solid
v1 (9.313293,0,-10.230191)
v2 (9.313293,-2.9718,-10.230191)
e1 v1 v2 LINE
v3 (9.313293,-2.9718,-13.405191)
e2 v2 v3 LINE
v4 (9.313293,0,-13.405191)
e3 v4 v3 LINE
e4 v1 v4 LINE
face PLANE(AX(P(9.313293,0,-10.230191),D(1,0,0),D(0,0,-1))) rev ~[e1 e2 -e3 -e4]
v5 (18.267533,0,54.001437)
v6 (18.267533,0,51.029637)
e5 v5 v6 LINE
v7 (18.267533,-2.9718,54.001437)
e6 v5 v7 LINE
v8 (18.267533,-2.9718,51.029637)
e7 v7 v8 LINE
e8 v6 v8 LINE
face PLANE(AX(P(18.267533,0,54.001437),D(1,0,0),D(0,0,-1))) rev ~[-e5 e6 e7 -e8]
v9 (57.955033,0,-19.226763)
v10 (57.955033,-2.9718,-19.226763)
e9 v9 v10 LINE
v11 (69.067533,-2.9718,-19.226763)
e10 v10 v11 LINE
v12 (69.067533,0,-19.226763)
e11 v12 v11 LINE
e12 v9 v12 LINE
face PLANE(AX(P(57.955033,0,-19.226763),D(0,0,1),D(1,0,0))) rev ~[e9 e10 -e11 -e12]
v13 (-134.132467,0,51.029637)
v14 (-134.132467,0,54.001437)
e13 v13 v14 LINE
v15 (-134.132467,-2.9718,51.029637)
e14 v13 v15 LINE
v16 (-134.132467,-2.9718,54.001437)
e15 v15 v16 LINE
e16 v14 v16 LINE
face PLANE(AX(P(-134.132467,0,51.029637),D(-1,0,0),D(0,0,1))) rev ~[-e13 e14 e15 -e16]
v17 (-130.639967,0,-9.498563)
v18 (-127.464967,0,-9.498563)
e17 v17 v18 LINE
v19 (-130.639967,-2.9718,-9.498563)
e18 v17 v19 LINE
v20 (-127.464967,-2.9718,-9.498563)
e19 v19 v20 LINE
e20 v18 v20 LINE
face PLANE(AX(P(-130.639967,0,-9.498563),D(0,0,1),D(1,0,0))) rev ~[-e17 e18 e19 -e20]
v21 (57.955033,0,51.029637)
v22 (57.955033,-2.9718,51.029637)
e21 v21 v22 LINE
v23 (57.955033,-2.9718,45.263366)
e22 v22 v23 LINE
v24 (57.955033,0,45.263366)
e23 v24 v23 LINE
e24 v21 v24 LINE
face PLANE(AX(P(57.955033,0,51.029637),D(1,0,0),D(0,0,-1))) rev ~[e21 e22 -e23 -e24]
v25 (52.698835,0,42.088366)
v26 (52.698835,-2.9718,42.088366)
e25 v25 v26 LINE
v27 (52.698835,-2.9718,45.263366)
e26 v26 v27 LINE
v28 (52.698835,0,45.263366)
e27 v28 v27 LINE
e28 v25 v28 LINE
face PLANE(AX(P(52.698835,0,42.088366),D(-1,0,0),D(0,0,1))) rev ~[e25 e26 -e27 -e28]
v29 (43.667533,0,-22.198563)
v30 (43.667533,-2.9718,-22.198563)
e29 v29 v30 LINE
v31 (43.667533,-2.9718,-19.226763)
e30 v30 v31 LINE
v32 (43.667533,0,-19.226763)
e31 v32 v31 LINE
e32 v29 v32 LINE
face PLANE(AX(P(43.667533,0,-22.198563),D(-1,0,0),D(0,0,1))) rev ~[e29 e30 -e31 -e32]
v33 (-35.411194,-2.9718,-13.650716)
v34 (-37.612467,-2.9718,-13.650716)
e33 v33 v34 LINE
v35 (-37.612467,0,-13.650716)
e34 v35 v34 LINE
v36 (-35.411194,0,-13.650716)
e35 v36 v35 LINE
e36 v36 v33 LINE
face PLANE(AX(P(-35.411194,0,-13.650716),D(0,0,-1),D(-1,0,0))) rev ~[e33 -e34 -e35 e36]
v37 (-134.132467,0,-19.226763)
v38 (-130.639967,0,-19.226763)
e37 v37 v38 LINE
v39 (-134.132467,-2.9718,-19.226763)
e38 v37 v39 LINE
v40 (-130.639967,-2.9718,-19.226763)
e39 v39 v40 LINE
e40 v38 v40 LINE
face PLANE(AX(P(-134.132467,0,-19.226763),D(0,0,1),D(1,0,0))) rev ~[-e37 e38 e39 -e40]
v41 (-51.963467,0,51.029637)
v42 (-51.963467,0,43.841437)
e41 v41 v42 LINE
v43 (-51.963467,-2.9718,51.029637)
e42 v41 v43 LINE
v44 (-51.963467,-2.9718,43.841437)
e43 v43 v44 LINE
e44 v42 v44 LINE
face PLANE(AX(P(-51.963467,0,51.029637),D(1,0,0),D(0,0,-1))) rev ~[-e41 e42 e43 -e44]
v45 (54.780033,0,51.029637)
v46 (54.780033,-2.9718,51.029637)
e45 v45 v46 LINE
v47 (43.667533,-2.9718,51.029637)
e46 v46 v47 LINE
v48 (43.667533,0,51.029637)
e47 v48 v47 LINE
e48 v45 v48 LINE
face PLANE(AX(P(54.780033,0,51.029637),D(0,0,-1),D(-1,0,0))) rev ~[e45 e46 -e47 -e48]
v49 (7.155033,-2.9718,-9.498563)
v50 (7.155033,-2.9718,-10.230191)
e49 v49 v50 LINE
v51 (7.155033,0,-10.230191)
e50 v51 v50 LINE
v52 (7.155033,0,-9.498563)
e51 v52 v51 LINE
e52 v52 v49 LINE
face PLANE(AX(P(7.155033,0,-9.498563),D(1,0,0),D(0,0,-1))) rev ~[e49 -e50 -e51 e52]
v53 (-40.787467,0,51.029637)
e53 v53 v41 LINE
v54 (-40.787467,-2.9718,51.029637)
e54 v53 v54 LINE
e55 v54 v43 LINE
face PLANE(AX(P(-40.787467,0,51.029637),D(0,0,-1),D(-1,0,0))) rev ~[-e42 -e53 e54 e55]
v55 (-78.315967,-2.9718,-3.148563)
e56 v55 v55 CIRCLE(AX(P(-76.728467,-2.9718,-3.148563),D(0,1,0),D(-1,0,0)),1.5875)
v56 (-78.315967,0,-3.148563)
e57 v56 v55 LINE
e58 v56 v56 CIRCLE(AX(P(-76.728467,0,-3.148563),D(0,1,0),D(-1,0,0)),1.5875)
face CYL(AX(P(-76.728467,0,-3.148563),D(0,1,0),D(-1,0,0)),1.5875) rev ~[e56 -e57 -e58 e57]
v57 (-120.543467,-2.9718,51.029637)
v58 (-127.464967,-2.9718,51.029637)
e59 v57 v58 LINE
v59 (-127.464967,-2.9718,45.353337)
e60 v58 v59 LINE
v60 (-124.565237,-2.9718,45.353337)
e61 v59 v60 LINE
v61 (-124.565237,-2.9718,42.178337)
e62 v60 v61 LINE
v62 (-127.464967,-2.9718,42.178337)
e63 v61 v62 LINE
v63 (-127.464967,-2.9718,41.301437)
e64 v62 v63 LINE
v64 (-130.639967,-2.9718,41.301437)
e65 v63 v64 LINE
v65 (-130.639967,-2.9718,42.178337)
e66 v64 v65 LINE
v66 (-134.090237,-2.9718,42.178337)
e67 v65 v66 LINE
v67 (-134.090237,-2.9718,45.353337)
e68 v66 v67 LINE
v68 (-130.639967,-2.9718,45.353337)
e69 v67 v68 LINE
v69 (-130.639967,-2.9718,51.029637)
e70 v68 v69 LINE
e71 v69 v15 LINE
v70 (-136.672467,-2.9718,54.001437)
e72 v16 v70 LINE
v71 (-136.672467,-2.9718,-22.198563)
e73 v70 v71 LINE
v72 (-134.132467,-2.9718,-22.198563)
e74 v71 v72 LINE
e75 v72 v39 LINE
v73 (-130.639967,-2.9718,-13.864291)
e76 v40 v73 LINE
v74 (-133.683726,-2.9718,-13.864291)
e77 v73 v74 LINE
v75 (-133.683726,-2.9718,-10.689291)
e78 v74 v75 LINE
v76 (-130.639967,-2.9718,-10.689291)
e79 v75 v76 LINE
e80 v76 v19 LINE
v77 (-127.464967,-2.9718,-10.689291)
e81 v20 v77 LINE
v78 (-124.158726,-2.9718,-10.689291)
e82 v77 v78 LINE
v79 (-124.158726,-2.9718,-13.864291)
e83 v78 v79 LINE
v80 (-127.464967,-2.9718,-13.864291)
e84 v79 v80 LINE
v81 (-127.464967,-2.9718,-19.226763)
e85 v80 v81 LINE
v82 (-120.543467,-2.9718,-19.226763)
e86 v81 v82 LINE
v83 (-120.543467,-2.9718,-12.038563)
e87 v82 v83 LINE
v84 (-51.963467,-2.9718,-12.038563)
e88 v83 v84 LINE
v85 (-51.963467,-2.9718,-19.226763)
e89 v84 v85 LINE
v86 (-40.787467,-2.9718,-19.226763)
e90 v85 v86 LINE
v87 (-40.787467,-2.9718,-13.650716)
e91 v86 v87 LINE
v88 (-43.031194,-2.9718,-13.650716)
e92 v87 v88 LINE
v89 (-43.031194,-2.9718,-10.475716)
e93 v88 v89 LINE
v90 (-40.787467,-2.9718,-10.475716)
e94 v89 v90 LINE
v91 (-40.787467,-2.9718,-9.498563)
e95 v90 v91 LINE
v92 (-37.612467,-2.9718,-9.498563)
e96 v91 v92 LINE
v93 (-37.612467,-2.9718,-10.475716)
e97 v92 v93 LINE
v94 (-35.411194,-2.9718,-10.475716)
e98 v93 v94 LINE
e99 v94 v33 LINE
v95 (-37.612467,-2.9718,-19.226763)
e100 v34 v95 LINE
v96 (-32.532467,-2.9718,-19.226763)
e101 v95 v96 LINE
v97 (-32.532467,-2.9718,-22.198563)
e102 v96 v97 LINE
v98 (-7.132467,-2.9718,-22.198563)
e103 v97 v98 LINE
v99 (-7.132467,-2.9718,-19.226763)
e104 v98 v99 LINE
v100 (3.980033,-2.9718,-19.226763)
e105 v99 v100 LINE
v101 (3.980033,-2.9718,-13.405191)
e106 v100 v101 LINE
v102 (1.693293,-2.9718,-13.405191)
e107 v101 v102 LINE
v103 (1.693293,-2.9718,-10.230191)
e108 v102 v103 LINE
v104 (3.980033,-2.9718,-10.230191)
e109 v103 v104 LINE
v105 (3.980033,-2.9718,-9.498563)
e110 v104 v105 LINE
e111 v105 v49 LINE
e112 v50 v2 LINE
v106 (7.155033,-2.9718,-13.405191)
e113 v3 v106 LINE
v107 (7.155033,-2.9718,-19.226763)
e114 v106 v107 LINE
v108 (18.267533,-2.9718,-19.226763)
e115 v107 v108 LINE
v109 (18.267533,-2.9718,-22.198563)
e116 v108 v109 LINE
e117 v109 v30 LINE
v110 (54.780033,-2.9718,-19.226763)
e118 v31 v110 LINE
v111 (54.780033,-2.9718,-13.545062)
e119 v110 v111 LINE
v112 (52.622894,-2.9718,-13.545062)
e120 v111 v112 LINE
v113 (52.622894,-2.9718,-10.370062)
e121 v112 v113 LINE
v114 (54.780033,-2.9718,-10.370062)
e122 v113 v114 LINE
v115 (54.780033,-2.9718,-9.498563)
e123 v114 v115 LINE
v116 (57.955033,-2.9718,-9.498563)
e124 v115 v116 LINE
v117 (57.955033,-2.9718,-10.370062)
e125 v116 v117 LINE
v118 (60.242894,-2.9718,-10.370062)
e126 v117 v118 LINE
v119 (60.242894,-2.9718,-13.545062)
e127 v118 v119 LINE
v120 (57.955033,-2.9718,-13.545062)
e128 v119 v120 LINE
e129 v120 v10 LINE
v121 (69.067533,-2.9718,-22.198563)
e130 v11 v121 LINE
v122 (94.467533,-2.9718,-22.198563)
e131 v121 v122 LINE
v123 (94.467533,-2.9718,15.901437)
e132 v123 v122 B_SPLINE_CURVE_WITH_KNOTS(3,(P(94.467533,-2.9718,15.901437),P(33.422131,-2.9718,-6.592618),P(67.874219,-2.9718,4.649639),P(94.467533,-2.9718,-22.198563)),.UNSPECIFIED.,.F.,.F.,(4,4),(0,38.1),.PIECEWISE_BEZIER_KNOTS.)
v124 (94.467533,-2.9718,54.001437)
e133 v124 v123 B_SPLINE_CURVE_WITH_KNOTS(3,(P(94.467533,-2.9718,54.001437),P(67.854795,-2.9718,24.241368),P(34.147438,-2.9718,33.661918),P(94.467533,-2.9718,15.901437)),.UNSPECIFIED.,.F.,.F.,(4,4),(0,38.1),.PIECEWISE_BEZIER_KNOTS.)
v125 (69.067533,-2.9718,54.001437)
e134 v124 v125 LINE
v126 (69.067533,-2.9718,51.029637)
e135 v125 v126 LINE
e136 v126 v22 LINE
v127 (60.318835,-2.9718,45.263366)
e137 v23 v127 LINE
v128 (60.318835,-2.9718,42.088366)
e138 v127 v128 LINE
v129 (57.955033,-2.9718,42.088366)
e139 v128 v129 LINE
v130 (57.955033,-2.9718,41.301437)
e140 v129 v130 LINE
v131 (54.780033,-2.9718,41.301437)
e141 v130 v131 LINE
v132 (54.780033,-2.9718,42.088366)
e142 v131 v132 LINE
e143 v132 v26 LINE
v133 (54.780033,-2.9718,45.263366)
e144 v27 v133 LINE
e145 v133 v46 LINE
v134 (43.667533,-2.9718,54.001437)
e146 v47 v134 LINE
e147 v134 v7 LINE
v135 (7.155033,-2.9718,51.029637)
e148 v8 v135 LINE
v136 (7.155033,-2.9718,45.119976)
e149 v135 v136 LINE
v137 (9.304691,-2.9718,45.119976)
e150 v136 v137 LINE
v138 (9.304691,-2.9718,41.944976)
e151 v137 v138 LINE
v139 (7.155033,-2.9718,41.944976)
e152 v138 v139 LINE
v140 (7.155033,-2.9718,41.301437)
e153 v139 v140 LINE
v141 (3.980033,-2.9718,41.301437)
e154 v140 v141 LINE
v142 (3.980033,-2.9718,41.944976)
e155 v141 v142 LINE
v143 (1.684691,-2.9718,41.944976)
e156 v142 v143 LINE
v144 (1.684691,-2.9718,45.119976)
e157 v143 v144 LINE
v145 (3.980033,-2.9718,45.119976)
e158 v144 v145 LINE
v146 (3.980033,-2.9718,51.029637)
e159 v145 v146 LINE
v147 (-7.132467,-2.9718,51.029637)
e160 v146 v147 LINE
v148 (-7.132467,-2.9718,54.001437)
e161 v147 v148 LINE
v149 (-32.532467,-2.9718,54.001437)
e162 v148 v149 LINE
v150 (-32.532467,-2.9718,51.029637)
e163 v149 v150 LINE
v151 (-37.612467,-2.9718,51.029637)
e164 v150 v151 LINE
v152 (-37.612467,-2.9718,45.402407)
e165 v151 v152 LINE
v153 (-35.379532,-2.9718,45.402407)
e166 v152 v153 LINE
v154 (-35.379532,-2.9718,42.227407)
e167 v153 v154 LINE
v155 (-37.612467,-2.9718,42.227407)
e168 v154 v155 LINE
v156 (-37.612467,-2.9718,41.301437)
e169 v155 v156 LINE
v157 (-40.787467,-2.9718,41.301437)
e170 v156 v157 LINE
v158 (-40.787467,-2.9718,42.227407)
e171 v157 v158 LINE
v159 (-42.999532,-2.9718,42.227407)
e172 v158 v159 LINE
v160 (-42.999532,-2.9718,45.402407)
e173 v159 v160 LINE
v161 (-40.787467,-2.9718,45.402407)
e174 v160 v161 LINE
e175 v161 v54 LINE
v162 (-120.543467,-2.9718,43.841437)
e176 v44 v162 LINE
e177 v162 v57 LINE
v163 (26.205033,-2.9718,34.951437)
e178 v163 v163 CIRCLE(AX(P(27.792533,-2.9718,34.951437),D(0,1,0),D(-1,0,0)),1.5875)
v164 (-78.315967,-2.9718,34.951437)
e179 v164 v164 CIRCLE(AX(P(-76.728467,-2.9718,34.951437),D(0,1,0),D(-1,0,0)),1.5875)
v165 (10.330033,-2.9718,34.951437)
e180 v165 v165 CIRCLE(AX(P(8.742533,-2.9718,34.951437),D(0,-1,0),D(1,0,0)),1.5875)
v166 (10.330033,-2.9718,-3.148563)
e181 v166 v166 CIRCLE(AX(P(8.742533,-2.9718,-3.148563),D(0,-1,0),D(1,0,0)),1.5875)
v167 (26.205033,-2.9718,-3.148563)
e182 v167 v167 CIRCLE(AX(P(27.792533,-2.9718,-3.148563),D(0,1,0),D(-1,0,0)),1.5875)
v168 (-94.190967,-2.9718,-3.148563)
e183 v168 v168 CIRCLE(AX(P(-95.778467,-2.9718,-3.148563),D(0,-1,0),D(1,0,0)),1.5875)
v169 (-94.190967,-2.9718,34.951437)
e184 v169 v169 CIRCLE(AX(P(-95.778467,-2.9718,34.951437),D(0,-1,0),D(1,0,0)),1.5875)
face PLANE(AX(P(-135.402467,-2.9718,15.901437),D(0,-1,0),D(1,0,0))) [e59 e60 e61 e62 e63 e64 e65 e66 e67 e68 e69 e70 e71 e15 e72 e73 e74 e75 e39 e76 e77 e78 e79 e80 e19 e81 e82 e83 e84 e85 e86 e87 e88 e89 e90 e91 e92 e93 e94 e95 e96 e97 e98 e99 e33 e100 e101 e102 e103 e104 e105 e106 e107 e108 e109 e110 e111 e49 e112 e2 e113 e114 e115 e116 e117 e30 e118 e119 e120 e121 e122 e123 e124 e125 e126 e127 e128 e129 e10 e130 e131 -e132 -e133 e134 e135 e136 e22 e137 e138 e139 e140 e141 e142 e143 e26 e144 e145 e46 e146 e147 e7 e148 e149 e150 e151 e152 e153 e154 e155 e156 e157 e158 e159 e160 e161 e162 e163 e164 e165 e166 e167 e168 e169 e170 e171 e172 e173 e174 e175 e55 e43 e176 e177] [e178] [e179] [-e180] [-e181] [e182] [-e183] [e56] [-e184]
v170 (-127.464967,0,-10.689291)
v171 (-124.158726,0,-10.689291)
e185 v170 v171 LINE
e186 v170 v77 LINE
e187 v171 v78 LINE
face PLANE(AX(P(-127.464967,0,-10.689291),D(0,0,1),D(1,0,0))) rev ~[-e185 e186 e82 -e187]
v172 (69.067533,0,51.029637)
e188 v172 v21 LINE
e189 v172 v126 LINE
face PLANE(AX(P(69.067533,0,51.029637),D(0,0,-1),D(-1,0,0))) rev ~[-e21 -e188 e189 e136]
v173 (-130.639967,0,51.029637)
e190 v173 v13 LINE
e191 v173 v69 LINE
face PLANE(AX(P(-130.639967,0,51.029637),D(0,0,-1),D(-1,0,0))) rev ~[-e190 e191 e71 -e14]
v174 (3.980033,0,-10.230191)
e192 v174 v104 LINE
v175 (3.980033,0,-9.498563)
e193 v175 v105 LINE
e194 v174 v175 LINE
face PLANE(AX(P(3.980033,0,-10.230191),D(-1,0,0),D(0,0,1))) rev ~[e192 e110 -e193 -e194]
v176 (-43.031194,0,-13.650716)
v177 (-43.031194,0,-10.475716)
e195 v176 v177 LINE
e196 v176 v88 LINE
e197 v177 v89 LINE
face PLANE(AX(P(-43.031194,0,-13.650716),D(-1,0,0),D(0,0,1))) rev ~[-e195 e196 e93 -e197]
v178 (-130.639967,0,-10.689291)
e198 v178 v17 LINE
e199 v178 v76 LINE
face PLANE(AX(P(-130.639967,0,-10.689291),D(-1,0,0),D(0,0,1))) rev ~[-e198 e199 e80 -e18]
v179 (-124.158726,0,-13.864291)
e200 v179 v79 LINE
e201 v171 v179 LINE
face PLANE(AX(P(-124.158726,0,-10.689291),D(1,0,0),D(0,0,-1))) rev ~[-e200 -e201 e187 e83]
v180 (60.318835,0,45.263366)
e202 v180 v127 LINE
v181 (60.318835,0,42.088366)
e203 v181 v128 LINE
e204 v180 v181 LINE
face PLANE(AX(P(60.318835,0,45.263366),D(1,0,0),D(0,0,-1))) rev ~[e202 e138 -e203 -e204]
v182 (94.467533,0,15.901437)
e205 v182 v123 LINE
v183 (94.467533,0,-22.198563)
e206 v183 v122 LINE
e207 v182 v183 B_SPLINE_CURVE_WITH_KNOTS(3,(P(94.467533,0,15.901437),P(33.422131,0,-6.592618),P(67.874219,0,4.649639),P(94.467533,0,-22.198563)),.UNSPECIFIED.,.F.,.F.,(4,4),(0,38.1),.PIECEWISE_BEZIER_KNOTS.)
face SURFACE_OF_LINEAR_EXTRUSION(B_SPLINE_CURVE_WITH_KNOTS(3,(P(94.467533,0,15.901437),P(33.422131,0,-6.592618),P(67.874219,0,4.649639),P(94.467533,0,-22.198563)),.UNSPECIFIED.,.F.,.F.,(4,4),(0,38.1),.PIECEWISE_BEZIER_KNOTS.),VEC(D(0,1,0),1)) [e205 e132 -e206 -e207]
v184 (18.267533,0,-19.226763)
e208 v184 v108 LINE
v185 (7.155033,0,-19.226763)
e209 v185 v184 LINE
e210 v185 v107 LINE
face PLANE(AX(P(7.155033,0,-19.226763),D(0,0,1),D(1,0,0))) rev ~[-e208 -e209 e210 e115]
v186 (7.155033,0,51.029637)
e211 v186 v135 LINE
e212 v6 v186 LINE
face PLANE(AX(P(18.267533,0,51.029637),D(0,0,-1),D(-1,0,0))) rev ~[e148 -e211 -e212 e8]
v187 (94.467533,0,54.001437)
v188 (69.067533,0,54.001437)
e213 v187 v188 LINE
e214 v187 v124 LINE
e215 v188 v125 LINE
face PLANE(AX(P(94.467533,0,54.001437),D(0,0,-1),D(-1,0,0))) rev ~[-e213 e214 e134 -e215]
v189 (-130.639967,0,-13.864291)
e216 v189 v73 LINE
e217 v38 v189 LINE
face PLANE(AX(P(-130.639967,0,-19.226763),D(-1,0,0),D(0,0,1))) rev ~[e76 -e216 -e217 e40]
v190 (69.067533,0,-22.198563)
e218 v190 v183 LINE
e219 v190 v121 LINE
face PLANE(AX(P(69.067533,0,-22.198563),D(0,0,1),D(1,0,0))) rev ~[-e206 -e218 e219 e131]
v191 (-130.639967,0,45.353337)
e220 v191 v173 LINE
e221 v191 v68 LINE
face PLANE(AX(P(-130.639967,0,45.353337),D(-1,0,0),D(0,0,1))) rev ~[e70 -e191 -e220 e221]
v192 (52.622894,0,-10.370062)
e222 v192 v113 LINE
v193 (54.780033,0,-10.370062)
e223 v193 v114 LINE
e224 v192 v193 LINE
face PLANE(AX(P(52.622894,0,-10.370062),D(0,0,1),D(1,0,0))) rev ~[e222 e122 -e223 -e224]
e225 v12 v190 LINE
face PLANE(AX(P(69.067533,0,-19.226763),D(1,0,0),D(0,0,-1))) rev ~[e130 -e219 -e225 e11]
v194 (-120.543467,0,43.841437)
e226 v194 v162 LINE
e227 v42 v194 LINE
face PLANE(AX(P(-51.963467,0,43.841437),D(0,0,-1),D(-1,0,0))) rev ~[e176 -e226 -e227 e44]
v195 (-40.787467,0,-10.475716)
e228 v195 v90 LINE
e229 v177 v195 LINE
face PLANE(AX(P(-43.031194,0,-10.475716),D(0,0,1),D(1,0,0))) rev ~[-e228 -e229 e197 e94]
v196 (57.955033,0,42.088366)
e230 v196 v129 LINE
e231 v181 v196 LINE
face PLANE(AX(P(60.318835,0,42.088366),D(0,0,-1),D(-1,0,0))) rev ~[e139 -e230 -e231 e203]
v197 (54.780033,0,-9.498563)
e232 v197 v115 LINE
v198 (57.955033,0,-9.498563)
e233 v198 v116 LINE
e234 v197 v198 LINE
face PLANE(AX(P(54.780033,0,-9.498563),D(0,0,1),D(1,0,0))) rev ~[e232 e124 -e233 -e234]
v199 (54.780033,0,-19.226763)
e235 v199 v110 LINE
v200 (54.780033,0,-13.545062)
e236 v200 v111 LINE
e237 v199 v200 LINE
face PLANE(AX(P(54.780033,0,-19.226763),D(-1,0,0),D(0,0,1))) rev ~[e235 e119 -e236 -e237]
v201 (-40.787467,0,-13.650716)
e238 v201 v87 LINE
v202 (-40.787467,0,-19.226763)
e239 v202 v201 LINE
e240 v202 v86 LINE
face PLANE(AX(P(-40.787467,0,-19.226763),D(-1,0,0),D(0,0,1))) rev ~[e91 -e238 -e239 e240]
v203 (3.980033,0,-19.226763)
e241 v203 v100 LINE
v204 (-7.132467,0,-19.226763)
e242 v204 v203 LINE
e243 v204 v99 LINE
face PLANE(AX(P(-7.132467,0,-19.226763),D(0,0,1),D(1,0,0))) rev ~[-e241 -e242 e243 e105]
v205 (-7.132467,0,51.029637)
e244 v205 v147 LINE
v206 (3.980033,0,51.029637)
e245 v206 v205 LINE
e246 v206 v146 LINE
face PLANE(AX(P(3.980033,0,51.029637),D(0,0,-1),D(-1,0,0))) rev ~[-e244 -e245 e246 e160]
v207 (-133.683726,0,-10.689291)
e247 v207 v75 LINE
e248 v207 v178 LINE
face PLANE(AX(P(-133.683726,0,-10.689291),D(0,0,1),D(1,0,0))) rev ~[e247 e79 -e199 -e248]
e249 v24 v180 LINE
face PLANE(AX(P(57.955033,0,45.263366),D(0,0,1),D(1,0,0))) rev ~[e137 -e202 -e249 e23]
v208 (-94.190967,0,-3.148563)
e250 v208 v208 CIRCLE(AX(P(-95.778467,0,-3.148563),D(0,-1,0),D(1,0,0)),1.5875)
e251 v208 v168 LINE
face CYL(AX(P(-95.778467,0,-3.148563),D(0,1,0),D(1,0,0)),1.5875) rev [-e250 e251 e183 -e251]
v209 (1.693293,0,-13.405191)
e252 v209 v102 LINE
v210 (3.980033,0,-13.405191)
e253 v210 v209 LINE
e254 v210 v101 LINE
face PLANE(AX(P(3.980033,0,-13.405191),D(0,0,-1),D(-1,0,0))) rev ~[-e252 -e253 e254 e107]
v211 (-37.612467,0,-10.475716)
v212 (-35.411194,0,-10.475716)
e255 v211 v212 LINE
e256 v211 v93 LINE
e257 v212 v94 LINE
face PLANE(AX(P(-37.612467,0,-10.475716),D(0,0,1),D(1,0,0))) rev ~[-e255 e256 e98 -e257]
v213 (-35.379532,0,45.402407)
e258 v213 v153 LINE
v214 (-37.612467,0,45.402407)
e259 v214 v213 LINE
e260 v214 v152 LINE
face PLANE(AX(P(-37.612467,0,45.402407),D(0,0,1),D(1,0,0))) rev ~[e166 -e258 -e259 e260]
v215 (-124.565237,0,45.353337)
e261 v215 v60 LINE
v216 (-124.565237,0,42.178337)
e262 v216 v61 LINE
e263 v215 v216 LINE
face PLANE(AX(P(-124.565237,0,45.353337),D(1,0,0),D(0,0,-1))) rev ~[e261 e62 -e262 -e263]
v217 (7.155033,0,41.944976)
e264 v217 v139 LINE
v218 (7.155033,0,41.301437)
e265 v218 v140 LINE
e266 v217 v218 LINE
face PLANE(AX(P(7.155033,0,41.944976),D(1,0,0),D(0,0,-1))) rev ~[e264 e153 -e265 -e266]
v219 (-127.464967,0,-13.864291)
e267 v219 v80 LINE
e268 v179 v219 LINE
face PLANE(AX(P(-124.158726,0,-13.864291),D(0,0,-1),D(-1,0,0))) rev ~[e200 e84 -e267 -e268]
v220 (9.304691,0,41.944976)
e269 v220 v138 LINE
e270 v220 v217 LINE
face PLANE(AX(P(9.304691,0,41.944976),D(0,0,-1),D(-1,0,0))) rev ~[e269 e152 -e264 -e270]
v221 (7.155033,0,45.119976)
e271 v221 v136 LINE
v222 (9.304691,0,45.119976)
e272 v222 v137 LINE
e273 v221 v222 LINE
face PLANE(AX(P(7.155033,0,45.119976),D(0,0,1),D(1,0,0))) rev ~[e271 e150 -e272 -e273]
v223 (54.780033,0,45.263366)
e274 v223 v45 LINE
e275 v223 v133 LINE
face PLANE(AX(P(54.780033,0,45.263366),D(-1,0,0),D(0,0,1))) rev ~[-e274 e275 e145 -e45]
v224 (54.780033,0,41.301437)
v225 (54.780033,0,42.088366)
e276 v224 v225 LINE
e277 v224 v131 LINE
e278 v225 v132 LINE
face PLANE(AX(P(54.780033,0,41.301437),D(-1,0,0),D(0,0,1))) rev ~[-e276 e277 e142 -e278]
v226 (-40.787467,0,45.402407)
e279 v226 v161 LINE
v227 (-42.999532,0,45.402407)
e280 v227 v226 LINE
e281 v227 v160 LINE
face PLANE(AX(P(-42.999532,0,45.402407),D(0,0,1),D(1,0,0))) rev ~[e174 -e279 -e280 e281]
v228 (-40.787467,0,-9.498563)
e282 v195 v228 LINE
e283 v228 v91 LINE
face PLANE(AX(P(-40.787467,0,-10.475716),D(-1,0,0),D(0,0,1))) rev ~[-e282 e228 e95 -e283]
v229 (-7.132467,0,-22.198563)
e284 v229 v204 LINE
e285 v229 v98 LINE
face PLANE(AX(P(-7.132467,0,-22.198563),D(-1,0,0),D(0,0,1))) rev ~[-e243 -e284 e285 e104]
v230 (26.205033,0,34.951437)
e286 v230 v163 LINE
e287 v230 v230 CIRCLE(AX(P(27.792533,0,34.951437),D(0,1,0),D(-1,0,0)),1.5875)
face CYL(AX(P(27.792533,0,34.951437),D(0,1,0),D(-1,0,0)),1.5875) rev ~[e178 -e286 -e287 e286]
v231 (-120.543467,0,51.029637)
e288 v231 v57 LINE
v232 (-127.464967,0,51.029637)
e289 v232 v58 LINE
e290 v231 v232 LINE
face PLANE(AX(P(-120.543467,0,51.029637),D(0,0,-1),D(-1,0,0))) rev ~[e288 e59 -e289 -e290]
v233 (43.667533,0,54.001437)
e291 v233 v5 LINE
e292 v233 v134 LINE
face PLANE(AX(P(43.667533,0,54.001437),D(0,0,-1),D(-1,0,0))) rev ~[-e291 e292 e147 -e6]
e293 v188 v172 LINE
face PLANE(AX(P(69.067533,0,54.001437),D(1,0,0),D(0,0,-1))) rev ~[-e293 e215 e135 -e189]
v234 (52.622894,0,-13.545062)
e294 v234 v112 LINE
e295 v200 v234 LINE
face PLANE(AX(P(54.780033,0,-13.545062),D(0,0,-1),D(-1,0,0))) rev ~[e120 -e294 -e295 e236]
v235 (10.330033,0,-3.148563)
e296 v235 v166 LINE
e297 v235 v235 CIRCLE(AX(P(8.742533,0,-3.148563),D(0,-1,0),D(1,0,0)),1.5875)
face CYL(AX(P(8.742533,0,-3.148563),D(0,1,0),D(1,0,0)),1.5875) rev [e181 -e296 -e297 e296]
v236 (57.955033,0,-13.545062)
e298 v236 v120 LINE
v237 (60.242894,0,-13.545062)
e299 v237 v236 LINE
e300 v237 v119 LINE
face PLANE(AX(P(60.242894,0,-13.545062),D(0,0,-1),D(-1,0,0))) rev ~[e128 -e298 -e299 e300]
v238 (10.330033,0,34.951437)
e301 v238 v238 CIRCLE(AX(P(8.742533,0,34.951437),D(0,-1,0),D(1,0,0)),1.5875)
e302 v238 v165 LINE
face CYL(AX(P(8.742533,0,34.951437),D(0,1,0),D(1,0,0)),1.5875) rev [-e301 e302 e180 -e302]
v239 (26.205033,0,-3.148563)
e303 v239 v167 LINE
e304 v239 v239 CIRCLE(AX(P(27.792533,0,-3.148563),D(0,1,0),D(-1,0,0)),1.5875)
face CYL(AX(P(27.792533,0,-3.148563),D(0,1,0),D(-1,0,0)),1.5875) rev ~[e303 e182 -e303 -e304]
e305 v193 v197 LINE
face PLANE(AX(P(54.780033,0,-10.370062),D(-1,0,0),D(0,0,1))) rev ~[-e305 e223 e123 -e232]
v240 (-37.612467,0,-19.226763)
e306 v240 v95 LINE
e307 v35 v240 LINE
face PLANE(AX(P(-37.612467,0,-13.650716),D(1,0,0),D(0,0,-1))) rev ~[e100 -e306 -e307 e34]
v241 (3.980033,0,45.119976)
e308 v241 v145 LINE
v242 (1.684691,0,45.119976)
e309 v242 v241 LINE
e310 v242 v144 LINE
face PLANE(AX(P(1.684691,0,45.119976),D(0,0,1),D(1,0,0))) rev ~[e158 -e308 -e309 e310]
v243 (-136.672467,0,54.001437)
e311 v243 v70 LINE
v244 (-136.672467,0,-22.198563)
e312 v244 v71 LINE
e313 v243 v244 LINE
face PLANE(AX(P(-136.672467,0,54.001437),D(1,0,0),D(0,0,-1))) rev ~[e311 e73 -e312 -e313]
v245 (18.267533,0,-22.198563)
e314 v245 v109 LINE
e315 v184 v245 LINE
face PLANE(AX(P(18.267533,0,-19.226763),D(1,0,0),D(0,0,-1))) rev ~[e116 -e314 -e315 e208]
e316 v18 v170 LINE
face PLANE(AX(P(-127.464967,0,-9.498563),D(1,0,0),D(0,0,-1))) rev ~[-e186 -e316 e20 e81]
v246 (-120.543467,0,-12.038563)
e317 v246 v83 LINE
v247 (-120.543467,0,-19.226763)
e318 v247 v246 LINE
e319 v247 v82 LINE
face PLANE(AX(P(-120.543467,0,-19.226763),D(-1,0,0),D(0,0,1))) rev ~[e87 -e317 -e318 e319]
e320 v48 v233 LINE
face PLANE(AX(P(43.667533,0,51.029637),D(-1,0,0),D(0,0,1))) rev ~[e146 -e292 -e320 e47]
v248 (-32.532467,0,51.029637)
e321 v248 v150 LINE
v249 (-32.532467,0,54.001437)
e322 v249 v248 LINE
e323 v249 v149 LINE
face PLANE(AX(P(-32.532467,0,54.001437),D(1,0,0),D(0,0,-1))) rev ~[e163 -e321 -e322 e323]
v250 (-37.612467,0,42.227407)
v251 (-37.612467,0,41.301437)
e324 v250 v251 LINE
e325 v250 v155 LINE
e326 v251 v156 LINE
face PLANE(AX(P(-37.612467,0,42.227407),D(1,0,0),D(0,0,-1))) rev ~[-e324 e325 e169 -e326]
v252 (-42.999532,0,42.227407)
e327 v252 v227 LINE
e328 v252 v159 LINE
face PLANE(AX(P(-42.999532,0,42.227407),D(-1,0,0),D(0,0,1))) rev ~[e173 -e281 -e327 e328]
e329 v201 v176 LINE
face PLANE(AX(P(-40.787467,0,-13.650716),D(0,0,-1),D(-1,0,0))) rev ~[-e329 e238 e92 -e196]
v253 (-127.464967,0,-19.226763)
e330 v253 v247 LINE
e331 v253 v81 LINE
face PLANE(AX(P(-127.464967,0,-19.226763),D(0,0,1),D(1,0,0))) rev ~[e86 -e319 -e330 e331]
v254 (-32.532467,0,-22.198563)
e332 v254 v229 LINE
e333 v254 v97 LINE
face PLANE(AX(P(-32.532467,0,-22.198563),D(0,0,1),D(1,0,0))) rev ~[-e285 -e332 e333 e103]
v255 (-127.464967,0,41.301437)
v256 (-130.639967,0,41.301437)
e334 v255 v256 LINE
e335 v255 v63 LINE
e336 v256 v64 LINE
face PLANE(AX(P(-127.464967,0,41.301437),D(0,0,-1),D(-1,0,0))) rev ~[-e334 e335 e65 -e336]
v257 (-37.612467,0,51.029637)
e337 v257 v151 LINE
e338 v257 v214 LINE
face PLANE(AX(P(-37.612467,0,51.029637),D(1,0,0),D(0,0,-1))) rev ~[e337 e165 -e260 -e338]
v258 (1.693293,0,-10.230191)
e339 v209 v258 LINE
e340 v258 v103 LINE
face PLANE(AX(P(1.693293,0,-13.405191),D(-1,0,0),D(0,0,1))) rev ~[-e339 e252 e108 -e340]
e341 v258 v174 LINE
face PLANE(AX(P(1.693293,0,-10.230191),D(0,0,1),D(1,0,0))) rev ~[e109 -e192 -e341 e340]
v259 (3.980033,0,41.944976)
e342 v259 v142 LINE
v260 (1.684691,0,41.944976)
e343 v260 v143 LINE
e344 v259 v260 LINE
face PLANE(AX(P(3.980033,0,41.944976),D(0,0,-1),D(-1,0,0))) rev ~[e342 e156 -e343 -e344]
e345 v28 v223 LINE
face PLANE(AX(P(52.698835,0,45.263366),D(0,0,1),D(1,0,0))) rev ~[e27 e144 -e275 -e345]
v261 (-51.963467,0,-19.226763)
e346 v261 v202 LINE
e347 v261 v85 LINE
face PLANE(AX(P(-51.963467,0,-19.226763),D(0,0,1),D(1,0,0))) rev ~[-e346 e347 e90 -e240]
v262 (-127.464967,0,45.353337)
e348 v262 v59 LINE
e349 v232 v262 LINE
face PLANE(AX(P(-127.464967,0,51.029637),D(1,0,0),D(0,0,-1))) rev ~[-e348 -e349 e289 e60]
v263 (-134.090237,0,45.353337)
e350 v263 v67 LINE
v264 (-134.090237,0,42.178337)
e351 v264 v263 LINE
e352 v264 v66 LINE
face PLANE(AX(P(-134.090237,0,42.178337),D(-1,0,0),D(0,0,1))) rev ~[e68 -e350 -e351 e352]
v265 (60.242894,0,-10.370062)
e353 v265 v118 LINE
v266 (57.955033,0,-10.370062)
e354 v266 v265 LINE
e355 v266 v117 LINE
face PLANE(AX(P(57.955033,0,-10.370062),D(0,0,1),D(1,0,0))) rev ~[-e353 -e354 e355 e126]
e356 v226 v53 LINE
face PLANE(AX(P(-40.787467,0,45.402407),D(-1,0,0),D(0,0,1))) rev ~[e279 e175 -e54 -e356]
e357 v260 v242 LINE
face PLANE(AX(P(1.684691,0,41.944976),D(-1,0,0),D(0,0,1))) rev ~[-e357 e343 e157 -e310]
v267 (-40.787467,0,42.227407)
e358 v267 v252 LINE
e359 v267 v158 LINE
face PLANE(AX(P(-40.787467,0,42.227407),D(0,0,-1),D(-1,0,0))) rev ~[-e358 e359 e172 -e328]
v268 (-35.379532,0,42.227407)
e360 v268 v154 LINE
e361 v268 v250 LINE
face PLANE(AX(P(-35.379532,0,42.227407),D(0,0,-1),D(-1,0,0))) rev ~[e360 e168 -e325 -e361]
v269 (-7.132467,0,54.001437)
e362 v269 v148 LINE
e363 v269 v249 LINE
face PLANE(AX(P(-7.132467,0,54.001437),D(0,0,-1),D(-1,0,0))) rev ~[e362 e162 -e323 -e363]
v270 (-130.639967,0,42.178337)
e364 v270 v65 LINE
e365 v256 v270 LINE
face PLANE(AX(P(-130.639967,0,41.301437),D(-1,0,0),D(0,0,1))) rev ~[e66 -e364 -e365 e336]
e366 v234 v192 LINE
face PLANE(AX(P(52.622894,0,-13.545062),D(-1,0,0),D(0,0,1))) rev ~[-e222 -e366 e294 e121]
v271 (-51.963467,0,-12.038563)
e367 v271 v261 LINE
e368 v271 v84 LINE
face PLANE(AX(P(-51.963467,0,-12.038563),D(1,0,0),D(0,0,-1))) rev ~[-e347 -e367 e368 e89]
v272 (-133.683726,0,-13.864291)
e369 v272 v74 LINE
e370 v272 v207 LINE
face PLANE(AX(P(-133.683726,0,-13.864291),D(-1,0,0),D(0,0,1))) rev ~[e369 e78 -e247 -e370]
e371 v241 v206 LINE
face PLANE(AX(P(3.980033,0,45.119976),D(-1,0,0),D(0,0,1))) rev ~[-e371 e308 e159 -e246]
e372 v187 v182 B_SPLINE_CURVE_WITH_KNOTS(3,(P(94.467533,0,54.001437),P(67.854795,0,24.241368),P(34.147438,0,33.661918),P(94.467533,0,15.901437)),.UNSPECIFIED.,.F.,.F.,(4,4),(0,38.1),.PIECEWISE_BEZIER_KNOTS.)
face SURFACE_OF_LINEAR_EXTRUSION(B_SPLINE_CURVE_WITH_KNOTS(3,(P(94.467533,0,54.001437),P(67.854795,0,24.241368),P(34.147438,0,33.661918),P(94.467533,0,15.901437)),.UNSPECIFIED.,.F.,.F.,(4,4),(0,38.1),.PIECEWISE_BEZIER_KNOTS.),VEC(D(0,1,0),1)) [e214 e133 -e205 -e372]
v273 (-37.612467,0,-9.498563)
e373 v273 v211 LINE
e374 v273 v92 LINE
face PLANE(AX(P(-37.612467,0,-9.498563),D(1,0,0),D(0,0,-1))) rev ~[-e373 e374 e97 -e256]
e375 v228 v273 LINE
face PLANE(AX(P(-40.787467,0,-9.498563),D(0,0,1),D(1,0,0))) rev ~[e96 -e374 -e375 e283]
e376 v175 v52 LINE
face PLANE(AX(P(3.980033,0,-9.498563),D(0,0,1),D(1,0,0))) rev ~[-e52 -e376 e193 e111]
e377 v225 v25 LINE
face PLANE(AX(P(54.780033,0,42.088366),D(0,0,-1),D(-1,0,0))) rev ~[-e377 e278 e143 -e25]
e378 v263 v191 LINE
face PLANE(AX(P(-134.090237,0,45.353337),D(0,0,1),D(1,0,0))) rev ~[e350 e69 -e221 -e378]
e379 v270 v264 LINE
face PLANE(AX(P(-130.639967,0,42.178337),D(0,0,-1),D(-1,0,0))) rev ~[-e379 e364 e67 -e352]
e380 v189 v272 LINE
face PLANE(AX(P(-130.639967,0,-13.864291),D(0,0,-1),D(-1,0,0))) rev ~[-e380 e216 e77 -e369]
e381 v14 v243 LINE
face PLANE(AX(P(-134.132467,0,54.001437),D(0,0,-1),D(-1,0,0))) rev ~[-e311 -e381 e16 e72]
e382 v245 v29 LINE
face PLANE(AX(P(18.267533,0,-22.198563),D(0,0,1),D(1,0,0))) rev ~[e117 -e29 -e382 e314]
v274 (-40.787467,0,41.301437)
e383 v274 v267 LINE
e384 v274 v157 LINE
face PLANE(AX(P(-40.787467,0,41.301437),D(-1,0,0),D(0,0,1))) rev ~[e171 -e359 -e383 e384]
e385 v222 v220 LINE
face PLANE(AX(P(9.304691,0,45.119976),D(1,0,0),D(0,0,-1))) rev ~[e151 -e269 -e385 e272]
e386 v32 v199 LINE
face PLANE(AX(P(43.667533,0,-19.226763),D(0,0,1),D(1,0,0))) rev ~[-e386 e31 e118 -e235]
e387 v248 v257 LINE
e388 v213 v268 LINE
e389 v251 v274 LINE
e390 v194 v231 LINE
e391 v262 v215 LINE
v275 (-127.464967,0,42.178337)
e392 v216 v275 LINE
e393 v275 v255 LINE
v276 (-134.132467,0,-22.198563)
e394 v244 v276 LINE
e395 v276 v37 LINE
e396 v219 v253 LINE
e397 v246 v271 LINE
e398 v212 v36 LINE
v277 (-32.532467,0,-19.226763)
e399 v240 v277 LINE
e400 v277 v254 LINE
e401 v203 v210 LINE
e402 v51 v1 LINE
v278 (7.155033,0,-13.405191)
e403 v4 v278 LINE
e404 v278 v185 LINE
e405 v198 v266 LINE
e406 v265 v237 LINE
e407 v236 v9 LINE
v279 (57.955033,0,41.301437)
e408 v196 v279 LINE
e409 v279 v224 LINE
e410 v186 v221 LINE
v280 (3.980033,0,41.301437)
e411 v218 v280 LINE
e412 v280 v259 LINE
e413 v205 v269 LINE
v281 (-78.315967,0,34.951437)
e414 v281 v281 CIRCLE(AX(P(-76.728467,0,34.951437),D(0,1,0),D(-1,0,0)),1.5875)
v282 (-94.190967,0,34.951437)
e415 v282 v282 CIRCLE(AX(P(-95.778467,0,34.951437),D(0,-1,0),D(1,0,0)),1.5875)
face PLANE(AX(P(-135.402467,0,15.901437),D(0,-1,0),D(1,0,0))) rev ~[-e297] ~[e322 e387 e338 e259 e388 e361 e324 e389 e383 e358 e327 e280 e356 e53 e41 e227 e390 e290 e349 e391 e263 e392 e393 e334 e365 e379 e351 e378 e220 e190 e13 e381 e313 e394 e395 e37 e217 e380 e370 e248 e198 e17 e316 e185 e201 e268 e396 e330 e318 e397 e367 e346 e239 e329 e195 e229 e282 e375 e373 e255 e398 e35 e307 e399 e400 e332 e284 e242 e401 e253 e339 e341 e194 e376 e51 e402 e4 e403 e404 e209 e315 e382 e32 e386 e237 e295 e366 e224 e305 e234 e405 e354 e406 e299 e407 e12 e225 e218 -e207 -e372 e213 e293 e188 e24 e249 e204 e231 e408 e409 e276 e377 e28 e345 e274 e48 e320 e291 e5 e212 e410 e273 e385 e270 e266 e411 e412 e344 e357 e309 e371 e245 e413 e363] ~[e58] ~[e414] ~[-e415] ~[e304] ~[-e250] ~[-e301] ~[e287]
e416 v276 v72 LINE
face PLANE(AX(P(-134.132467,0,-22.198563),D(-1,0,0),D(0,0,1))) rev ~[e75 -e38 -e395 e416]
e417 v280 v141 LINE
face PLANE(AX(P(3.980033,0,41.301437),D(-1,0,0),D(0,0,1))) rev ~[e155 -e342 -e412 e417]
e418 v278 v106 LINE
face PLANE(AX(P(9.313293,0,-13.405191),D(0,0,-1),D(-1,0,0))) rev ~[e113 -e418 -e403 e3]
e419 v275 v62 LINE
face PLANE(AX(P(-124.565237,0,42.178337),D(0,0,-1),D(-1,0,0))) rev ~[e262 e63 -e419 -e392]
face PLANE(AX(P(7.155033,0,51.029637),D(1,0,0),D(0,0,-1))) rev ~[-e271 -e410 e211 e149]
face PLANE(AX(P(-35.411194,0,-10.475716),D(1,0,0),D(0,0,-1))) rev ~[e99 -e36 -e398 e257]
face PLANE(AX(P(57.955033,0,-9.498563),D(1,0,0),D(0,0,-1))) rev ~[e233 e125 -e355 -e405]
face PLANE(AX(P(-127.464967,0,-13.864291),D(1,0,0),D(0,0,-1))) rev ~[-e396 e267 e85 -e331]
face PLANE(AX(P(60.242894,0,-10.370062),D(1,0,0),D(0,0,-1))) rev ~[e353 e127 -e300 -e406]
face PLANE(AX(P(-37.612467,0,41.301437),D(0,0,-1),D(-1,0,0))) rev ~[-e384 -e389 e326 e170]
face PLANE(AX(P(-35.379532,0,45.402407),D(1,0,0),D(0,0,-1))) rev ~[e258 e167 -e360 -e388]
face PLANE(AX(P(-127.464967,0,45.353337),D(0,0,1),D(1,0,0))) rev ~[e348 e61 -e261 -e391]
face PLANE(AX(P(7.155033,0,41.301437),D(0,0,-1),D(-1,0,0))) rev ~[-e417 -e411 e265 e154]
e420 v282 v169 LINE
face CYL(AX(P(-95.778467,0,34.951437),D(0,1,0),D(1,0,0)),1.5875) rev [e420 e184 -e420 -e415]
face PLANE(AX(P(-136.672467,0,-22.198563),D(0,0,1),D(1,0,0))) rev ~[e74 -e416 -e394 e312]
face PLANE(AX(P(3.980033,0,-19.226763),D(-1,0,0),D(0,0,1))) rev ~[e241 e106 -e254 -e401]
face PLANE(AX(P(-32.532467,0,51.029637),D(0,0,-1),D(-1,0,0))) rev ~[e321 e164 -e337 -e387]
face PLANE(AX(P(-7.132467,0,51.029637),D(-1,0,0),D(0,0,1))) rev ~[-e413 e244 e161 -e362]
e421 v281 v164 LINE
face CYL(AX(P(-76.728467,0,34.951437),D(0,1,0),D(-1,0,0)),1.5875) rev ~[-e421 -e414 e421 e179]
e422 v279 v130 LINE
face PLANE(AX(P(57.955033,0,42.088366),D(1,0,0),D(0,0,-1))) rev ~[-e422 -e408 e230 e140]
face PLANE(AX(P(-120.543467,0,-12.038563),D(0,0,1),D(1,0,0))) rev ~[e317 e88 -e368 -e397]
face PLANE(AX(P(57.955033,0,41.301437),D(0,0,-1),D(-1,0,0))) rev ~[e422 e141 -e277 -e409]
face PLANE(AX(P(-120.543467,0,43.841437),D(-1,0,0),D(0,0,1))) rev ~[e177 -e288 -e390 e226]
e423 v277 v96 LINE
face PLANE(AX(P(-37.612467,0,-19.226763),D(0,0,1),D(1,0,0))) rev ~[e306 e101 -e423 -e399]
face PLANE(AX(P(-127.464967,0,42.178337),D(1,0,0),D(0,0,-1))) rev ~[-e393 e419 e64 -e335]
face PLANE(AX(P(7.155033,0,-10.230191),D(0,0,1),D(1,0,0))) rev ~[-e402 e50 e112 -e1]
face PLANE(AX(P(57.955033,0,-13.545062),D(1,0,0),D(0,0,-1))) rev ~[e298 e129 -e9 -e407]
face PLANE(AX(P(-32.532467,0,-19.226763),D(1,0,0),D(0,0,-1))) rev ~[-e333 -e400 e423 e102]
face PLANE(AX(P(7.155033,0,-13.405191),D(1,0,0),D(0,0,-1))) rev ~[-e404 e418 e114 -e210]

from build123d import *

# Parameters (mm, degrees)
F0_R     = 1.5875
F0_W     = 159.1020785272
F0_H     = 25.4
F1_DEPTH = 2.9718


# Not quite as in the source:
# - a feature names something its author has since deleted; it is built from what else it names


with BuildPart() as f1:
    # F0 (on Front) → F1 (new body)
    with BuildSketch(Plane.XZ):
        Polygon((-134.1324669933, 51.0296365122), (-134.1324669933, 54.0014365122), (-136.6724669933, 54.0014365122), (-136.6724669933, -22.1985634878), (-134.1324669933, -22.1985634878), (-134.1324669933, -19.2267634878), align=None)
        with BuildLine():
            Line((-130.6399669933, 51.0296365122), (-134.1324669933, 51.0296365122))
            Line((-134.1324669933, 51.0296365122), (-134.1324669933, -19.2267634878))
            Line((-134.1324669933, -19.2267634878), (-130.6399669933, -19.2267634878))
            Line((-130.6399669933, -19.2267634878), (-130.6399669933, -13.8642910361))
            Line((-130.6399669933, -13.8642910361), (-133.683725667, -13.8642910361))
            Line((-133.683725667, -13.8642910361), (-133.683725667, -10.6892910361))
            Line((-133.683725667, -10.6892910361), (-130.6399669933, -10.6892910361))
            Line((-130.6399669933, -10.6892910361), (-130.6399669933, -9.4985634878))
            Line((-130.6399669933, -9.4985634878), (-127.4649669933, -9.4985634878))
            Line((-127.4649669933, -9.4985634878), (-127.4649669933, -10.6892910361))
            Line((-127.4649669933, -10.6892910361), (-124.158725667, -10.6892910361))
            Line((-124.158725667, -10.6892910361), (-124.158725667, -13.8642910361))
            Line((-124.158725667, -13.8642910361), (-127.4649669933, -13.8642910361))
            Line((-127.4649669933, -13.8642910361), (-127.4649669933, -19.2267634878))
            Line((-127.4649669933, -19.2267634878), (-120.5434669933, -19.2267634878))
            Line((-120.5434669933, -19.2267634878), (-120.5434669933, -12.0385634878))
            Line((-120.5434669933, -12.0385634878), (-51.9634669933, -12.0385634878))
            Line((-51.9634669933, -12.0385634878), (-51.9634669933, -19.2267634878))
            Line((-51.9634669933, -19.2267634878), (-40.7874669933, -19.2267634878))
            Line((-40.7874669933, -19.2267634878), (-40.7874669933, -13.650716418))
            Line((-40.7874669933, -13.650716418), (-43.0311936414, -13.650716418))
            Line((-43.0311936414, -13.650716418), (-43.0311936414, -10.475716418))
            Line((-43.0311936414, -10.475716418), (-40.7874669933, -10.475716418))
            Line((-40.7874669933, -10.475716418), (-40.7874669933, -9.4985634878))
            Line((-40.7874669933, -9.4985634878), (-37.6124669933, -9.4985634878))
            Line((-37.6124669933, -9.4985634878), (-37.6124669933, -10.475716418))
            Line((-37.6124669933, -10.475716418), (-35.4111936414, -10.475716418))
            Line((-35.4111936414, -10.475716418), (-35.4111936414, -13.650716418))
            Line((-35.4111936414, -13.650716418), (-37.6124669933, -13.650716418))
            Line((-37.6124669933, -13.650716418), (-37.6124669933, -19.2267634878))
            Line((-37.6124669933, -19.2267634878), (-32.5324669933, -19.2267634878))
            Line((-32.5324669933, -19.2267634878), (-32.5324669933, -22.1985634878))
            Line((-32.5324669933, -22.1985634878), (-7.1324669933, -22.1985634878))
            Line((-7.1324669933, -22.1985634878), (-7.1324669933, -19.2267634878))
            Line((-7.1324669933, -19.2267634878), (3.9800330067, -19.2267634878))
            Line((3.9800330067, -19.2267634878), (3.9800330067, -13.4051909164))
            Line((3.9800330067, -13.4051909164), (1.6932926612, -13.4051909164))
            Line((1.6932926612, -13.4051909164), (1.6932926612, -10.2301909164))
            Line((1.6932926612, -10.2301909164), (3.9800330067, -10.2301909164))
            Line((3.9800330067, -10.2301909164), (3.9800330067, -9.4985634878))
            Line((3.9800330067, -9.4985634878), (7.1550330067, -9.4985634878))
            Line((7.1550330067, -9.4985634878), (7.1550330067, -10.2301909164))
            Line((7.1550330067, -10.2301909164), (9.3132926612, -10.2301909164))
            Line((9.3132926612, -10.2301909164), (9.3132926612, -13.4051909164))
            Line((9.3132926612, -13.4051909164), (7.1550330067, -13.4051909164))
            Line((7.1550330067, -13.4051909164), (7.1550330067, -19.2267634878))
            Line((7.1550330067, -19.2267634878), (18.2675330067, -19.2267634878))
            Line((18.2675330067, -19.2267634878), (18.2675330067, -22.1985634878))
            Line((18.2675330067, -22.1985634878), (43.6675330067, -22.1985634878))
            Line((43.6675330067, -22.1985634878), (43.6675330067, -19.2267634878))
            Line((43.6675330067, -19.2267634878), (54.7800330067, -19.2267634878))
            Line((54.7800330067, -19.2267634878), (54.7800330067, -13.545062393))
            Line((54.7800330067, -13.545062393), (52.6228938252, -13.545062393))
            Line((52.6228938252, -13.545062393), (52.6228938252, -10.370062393))
            Line((52.6228938252, -10.370062393), (54.7800330067, -10.370062393))
            Line((54.7800330067, -10.370062393), (54.7800330067, -9.4985634878))
            Line((54.7800330067, -9.4985634878), (57.9550330067, -9.4985634878))
            Line((57.9550330067, -9.4985634878), (57.9550330067, -10.370062393))
            Line((57.9550330067, -10.370062393), (60.2428938252, -10.370062393))
            Line((60.2428938252, -10.370062393), (60.2428938252, -13.545062393))
            Line((60.2428938252, -13.545062393), (57.9550330067, -13.545062393))
            Line((57.9550330067, -13.545062393), (57.9550330067, -19.2267634878))
            Line((57.9550330067, -19.2267634878), (69.0675330067, -19.2267634878))
            Line((69.0675330067, -19.2267634878), (69.0675330067, -22.1985634878))
            Line((69.0675330067, -22.1985634878), (94.4675330067, -22.1985634878))
            add(Edge.make_bspline(
                [(94.4675330067, 15.9014365122), (33.4221309805, -6.5926179945), (67.8742191577, 4.6496394366), (94.4675330067, -22.1985634878)],
                knots=[0, 0, 0, 0, 38.1, 38.1, 38.1, 38.1], degree=3))
            add(Edge.make_bspline(
                [(94.4675330067, 54.0014365122), (67.8547954941, 24.2413681328), (34.147437551, 33.6619180903), (94.4675330067, 15.9014365122)],
                knots=[0, 0, 0, 0, 38.1, 38.1, 38.1, 38.1], degree=3))
            Line((94.4675330067, 54.0014365122), (69.0675330067, 54.0014365122))
            Line((69.0675330067, 54.0014365122), (69.0675330067, 51.0296365122))
            Line((69.0675330067, 51.0296365122), (57.9550330067, 51.0296365122))
            Line((57.9550330067, 51.0296365122), (57.9550330067, 45.263365978))
            Line((57.9550330067, 45.263365978), (60.3188354051, 45.263365978))
            Line((60.3188354051, 45.263365978), (60.3188354051, 42.088365978))
            Line((60.3188354051, 42.088365978), (57.9550330067, 42.088365978))
            Line((57.9550330067, 42.088365978), (57.9550330067, 41.3014365122))
            Line((57.9550330067, 41.3014365122), (54.7800330067, 41.3014365122))
            Line((54.7800330067, 41.3014365122), (54.7800330067, 42.088365978))
            Line((54.7800330067, 42.088365978), (52.6988354051, 42.088365978))
            Line((52.6988354051, 42.088365978), (52.6988354051, 45.263365978))
            Line((52.6988354051, 45.263365978), (54.7800330067, 45.263365978))
            Line((54.7800330067, 45.263365978), (54.7800330067, 51.0296365122))
            Line((54.7800330067, 51.0296365122), (43.6675330067, 51.0296365122))
            Line((43.6675330067, 51.0296365122), (43.6675330067, 54.0014365122))
            Line((43.6675330067, 54.0014365122), (18.2675330067, 54.0014365122))
            Line((18.2675330067, 54.0014365122), (18.2675330067, 51.0296365122))
            Line((18.2675330067, 51.0296365122), (7.1550330067, 51.0296365122))
            Line((7.1550330067, 51.0296365122), (7.1550330067, 45.1199758291))
            Line((7.1550330067, 45.1199758291), (9.3046905002, 45.1199758291))
            Line((9.3046905002, 45.1199758291), (9.3046905002, 41.9449758291))
            Line((9.3046905002, 41.9449758291), (7.1550330067, 41.9449758291))
            Line((7.1550330067, 41.9449758291), (7.1550330067, 41.3014365122))
            Line((7.1550330067, 41.3014365122), (3.9800330067, 41.3014365122))
            Line((3.9800330067, 41.3014365122), (3.9800330067, 41.9449758291))
            Line((3.9800330067, 41.9449758291), (1.6846905002, 41.9449758291))
            Line((1.6846905002, 41.9449758291), (1.6846905002, 45.1199758291))
            Line((1.6846905002, 45.1199758291), (3.9800330067, 45.1199758291))
            Line((3.9800330067, 45.1199758291), (3.9800330067, 51.0296365122))
            Line((3.9800330067, 51.0296365122), (-7.1324669933, 51.0296365122))
            Line((-7.1324669933, 51.0296365122), (-7.1324669933, 54.0014365122))
            Line((-7.1324669933, 54.0014365122), (-32.5324669933, 54.0014365122))
            Line((-32.5324669933, 54.0014365122), (-32.5324669933, 51.0296365122))
            Line((-32.5324669933, 51.0296365122), (-37.6124669933, 51.0296365122))
            Line((-37.6124669933, 51.0296365122), (-37.6124669933, 45.4024068505))
            Line((-37.6124669933, 45.4024068505), (-35.3795323992, 45.4024068505))
            Line((-35.3795323992, 45.4024068505), (-35.3795323992, 42.2274068505))
            Line((-35.3795323992, 42.2274068505), (-37.6124669933, 42.2274068505))
            Line((-37.6124669933, 42.2274068505), (-37.6124669933, 41.3014365122))
            Line((-37.6124669933, 41.3014365122), (-40.7874669933, 41.3014365122))
            Line((-40.7874669933, 41.3014365122), (-40.7874669933, 42.2274068505))
            Line((-40.7874669933, 42.2274068505), (-42.9995323992, 42.2274068505))
            Line((-42.9995323992, 42.2274068505), (-42.9995323992, 45.4024068505))
            Line((-42.9995323992, 45.4024068505), (-40.7874669933, 45.4024068505))
            Line((-40.7874669933, 45.4024068505), (-40.7874669933, 51.0296365122))
            Line((-40.7874669933, 51.0296365122), (-51.9634669933, 51.0296365122))
            Line((-51.9634669933, 51.0296365122), (-51.9634669933, 43.8414365122))
            Line((-51.9634669933, 43.8414365122), (-120.5434669933, 43.8414365122))
            Line((-120.5434669933, 43.8414365122), (-120.5434669933, 51.0296365122))
            Line((-120.5434669933, 51.0296365122), (-127.4649669933, 51.0296365122))
            Line((-127.4649669933, 51.0296365122), (-127.4649669933, 45.3533373266))
            Line((-127.4649669933, 45.3533373266), (-124.5652367949, 45.3533373266))
            Line((-124.5652367949, 45.3533373266), (-124.5652367949, 42.1783373266))
            Line((-124.5652367949, 42.1783373266), (-127.4649669933, 42.1783373266))
            Line((-127.4649669933, 42.1783373266), (-127.4649669933, 41.3014365122))
            Line((-127.4649669933, 41.3014365122), (-130.6399669933, 41.3014365122))
            Line((-130.6399669933, 41.3014365122), (-130.6399669933, 42.1783373266))
            Line((-130.6399669933, 42.1783373266), (-134.0902367949, 42.1783373266))
            Line((-134.0902367949, 42.1783373266), (-134.0902367949, 45.3533373266))
            Line((-134.0902367949, 45.3533373266), (-130.6399669933, 45.3533373266))
            Line((-130.6399669933, 45.3533373266), (-130.6399669933, 51.0296365122))
        make_face()
        with Locations((-95.7784669933, -3.1485634878)):
            Circle(F0_R, mode=Mode.SUBTRACT)
        with BuildLine():
            ThreePointArc((-75.1409669933, -3.1485634878), (-76.7284669933, -4.7360634878), (-78.3159669933, -3.1485634878))
            ThreePointArc((-78.3159669933, -3.1485634878), (-76.7284669933, -1.5610634878), (-75.1409669933, -3.1485634878))
        make_face(mode=Mode.SUBTRACT)
        with Locations((8.7425330067, -3.1485634878)):
            Circle(F0_R, mode=Mode.SUBTRACT)
        with BuildLine():
            ThreePointArc((29.3800330067, -3.1485634878), (27.7925330067, -4.7360634878), (26.2050330067, -3.1485634878))
            ThreePointArc((26.2050330067, -3.1485634878), (27.7925330067, -1.5610634878), (29.3800330067, -3.1485634878))
        make_face(mode=Mode.SUBTRACT)
        with Locations((-29.1814277297, 15.9014365122)):
            Rectangle(F0_W, F0_H, mode=Mode.SUBTRACT)
        with Locations((-95.7784669933, 34.9514365122)):
            Circle(F0_R, mode=Mode.SUBTRACT)
        with BuildLine():
            ThreePointArc((-75.1409669933, 34.9514365122), (-76.7284669933, 33.3639365122), (-78.3159669933, 34.9514365122))
            ThreePointArc((-78.3159669933, 34.9514365122), (-76.7284669933, 36.5389365122), (-75.1409669933, 34.9514365122))
        make_face(mode=Mode.SUBTRACT)
        with Locations((8.7425330067, 34.9514365122)):
            Circle(F0_R, mode=Mode.SUBTRACT)
        with BuildLine():
            ThreePointArc((29.3800330067, 34.9514365122), (27.7925330067, 33.3639365122), (26.2050330067, 34.9514365122))
            ThreePointArc((26.2050330067, 34.9514365122), (27.7925330067, 36.5389365122), (29.3800330067, 34.9514365122))
        make_face(mode=Mode.SUBTRACT)
        with Locations((-29.1814277297, 15.9014365122)):
            Rectangle(F0_W, F0_H)
    extrude(amount=F1_DEPTH)


solid = f1.part
